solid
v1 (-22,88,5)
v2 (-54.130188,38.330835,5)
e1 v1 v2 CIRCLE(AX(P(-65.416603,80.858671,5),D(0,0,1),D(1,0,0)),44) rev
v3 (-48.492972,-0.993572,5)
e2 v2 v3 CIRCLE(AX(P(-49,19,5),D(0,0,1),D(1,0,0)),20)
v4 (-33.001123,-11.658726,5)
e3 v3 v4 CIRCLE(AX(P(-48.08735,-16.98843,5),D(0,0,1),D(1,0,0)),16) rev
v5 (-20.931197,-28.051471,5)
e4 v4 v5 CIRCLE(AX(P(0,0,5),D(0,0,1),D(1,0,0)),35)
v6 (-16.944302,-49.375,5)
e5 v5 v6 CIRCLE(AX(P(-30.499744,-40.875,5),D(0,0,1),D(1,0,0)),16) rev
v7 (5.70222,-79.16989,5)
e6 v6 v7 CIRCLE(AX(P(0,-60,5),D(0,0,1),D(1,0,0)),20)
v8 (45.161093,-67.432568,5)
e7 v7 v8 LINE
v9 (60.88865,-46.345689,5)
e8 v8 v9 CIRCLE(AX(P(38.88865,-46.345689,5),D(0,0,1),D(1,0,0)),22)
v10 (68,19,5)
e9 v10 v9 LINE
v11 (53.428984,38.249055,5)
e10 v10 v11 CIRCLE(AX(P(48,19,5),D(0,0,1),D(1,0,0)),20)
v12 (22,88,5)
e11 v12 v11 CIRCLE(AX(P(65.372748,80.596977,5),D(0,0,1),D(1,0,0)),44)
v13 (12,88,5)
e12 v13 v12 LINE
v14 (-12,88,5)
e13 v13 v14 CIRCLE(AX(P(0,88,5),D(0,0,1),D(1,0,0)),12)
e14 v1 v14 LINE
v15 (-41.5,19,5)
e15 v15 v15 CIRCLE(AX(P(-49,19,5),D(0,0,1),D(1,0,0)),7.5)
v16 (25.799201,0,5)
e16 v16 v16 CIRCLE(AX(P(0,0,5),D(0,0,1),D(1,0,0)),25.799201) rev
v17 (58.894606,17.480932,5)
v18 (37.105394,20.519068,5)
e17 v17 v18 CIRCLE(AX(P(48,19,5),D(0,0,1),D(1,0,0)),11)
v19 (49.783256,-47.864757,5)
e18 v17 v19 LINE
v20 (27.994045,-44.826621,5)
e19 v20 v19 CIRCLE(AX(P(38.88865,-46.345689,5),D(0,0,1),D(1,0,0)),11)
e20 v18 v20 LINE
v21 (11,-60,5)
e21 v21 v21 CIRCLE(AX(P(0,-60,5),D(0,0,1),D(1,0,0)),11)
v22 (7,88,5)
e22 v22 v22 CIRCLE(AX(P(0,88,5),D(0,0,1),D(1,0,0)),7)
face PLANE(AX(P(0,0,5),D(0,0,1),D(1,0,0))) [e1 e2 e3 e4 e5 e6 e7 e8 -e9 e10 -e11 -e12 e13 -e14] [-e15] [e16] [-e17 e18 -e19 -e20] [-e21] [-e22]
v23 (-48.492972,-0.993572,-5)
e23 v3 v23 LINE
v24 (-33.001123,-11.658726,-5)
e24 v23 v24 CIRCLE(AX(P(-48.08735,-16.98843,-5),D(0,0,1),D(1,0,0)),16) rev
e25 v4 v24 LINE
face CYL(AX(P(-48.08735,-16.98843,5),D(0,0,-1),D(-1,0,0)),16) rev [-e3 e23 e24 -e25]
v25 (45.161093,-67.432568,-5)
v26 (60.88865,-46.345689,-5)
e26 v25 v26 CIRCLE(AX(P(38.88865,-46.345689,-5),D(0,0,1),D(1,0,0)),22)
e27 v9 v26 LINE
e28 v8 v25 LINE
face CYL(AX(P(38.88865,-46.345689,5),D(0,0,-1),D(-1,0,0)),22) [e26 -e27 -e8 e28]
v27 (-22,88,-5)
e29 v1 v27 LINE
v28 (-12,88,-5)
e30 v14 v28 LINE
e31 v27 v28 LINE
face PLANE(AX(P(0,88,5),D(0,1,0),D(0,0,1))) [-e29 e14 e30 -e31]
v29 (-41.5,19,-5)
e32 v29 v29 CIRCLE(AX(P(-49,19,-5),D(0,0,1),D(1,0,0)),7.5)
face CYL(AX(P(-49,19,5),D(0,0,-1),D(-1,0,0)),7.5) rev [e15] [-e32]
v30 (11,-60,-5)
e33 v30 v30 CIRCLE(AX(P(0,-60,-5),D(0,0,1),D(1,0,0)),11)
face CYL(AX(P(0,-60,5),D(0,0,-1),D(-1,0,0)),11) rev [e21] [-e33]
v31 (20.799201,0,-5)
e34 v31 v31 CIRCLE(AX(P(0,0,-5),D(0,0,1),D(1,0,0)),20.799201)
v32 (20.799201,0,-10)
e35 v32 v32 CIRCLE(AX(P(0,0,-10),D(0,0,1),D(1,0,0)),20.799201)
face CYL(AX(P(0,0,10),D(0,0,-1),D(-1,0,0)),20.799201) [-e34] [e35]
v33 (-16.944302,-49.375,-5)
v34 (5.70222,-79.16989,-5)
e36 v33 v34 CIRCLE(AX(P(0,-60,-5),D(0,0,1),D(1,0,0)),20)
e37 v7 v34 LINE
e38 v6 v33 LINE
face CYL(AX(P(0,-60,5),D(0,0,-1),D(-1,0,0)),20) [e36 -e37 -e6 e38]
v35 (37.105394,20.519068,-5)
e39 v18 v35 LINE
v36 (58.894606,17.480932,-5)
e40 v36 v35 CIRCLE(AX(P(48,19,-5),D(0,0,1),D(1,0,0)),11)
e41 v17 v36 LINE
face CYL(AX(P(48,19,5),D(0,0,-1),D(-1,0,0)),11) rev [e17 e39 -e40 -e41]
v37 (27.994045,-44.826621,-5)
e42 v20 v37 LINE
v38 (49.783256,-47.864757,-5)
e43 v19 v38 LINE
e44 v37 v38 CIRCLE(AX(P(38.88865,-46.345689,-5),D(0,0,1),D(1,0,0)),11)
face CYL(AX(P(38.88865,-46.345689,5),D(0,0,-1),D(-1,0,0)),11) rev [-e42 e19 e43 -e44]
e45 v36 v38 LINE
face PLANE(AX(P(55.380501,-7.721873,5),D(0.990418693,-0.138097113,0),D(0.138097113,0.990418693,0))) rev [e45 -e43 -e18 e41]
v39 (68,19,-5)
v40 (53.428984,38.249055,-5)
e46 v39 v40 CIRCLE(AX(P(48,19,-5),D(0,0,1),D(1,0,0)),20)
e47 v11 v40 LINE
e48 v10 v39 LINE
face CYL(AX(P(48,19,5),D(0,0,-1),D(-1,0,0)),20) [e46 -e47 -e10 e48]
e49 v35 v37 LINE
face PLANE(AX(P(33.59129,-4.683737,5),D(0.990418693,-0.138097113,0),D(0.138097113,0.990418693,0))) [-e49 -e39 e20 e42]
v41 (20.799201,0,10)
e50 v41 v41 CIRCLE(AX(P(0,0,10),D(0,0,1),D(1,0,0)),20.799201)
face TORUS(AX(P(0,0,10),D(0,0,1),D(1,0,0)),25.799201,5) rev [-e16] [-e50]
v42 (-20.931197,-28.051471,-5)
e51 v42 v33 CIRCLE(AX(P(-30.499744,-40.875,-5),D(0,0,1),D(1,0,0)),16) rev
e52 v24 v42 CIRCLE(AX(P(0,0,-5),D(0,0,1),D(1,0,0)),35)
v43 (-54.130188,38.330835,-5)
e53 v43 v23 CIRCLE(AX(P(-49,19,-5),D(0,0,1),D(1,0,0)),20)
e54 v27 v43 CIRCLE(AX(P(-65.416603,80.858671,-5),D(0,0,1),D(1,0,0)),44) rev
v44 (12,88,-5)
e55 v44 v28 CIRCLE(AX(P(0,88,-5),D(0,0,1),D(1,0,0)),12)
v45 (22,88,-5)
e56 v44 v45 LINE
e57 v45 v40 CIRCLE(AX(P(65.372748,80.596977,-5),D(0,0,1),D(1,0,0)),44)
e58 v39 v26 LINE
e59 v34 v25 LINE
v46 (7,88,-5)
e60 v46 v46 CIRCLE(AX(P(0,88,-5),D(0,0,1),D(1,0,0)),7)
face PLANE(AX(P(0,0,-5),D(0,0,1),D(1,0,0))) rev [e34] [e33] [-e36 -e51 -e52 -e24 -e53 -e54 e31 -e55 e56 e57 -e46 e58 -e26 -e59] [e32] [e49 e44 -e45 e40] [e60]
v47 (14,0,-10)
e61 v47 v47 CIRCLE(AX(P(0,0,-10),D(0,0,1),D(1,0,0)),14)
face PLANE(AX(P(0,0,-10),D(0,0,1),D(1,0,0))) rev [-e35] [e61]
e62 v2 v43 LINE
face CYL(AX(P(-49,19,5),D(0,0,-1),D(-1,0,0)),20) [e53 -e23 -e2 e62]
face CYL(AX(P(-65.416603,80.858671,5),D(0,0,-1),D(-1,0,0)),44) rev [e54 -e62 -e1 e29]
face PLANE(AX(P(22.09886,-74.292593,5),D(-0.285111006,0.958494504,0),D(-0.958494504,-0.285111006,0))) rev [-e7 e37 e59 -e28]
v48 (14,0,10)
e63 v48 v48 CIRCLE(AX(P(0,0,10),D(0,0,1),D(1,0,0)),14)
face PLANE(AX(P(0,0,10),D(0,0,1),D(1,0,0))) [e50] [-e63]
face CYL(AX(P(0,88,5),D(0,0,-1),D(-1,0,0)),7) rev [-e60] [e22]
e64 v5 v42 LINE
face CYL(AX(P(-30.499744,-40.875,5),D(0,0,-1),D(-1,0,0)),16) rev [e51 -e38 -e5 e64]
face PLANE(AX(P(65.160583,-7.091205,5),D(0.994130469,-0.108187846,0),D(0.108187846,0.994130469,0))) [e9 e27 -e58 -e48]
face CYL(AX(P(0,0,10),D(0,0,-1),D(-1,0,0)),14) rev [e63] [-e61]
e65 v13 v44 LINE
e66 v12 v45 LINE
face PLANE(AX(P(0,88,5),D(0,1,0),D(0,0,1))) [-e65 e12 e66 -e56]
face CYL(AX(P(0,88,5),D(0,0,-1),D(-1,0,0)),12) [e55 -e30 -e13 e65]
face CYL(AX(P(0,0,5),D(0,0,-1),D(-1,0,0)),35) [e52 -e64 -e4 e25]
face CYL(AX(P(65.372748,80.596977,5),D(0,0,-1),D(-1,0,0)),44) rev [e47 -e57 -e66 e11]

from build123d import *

# Parameters (mm, degrees)
SKETCH1_R           = 20.799200533
SKETCH1_R_2         = 14
BOSS_EXTRUDE2_DEPTH = 10
SKETCH1_5_R         = 11
SKETCH1_5_R_2       = 20.799200533
SKETCH1_5_R_3       = 7.5
SKETCH1_5_R_4       = 7
BOSS_EXTRUDE3_DEPTH = 5
FILLET1_R           = 5


with BuildPart() as part:
    # Sketch1 → Boss-Extrude2 (new, symmetric)
    with BuildSketch(Plane.XY):
        Circle(SKETCH1_R)
        Circle(SKETCH1_R_2, mode=Mode.SUBTRACT)
    extrude(amount=BOSS_EXTRUDE2_DEPTH, both=True)

    # Sketch1<5> → Boss-Extrude3 (add, symmetric)
    with BuildSketch(Plane.XY):
        with BuildLine():
            Line((67.531815598, 14.697886629), (68, 19))
            ThreePointArc((68, 19), (63.946467856, 31.071046472), (53.428983707, 38.249055455))
            ThreePointArc((53.428983707, 38.249055455), (28.173712308, 57.097365678), (22, 88))
            Line((22, 88), (12, 88))
            ThreePointArc((12, 88), (0, 100), (-12, 88))
            Line((-12, 88), (-22, 88))
            ThreePointArc((-22, 88), (-28.472570597, 56.960167242), (-54.130188439, 38.330834606))
            ThreePointArc((-54.130188439, 38.330834606), (-68.797617118, 16.161980188), (-48.492972379, -0.993572042))
            ThreePointArc((-48.492972379, -0.993572042), (-39.014510451, -3.809523143), (-33.001122743, -11.658726248))
            ThreePointArc((-33.001122743, -11.658726248), (-28.18429152, -20.752004999), (-20.931196761, -28.051470588))
            ThreePointArc((-20.931196761, -28.051470588), (-14.77228566, -37.934411824), (-16.94430214, -49.375))
            ThreePointArc((-16.94430214, -49.375), (-15.922624494, -72.102480293), (5.70222012, -79.169890081))
            Line((5.70222012, -79.169890081), (45.161092518, -67.432567897))
            ThreePointArc((45.161092518, -67.432567897), (56.523753546, -59.49875448), (60.888650386, -46.345688809))
            Line((60.888650386, -46.345688809), (67.531815598, 14.697886629))
        make_face()
        with Locations((0, -60)):
            Circle(SKETCH1_5_R, mode=Mode.SUBTRACT)
        Circle(SKETCH1_5_R_2, mode=Mode.SUBTRACT)
        with BuildLine():
            ThreePointArc((37.105394377, 20.519068244), (49.519068244, 29.894605623), (58.894605623, 17.480931756))
            Line((58.894605623, 17.480931756), (49.783256009, -47.864757052))
            ThreePointArc((49.783256009, -47.864757052), (37.369582142, -57.240294431), (27.994044763, -44.826620565))
            Line((27.994044763, -44.826620565), (37.105394377, 20.519068244))
        make_face(mode=Mode.SUBTRACT)
        with Locations((-49, 19)):
            Circle(SKETCH1_5_R_3, mode=Mode.SUBTRACT)
        with Locations((0, 88)):
            Circle(SKETCH1_5_R_4, mode=Mode.SUBTRACT)
    extrude(amount=BOSS_EXTRUDE3_DEPTH, both=True)

    # Fillet1
    fillet1_edges = [part.edges().sort_by_distance(p)[0] for p in [
        (-20.799200533, 0, 5),
    ]]
    fillet(fillet1_edges, radius=FILLET1_R - 0.0001)  # a hair under: the kernel refuses the full size


solid = part.part
